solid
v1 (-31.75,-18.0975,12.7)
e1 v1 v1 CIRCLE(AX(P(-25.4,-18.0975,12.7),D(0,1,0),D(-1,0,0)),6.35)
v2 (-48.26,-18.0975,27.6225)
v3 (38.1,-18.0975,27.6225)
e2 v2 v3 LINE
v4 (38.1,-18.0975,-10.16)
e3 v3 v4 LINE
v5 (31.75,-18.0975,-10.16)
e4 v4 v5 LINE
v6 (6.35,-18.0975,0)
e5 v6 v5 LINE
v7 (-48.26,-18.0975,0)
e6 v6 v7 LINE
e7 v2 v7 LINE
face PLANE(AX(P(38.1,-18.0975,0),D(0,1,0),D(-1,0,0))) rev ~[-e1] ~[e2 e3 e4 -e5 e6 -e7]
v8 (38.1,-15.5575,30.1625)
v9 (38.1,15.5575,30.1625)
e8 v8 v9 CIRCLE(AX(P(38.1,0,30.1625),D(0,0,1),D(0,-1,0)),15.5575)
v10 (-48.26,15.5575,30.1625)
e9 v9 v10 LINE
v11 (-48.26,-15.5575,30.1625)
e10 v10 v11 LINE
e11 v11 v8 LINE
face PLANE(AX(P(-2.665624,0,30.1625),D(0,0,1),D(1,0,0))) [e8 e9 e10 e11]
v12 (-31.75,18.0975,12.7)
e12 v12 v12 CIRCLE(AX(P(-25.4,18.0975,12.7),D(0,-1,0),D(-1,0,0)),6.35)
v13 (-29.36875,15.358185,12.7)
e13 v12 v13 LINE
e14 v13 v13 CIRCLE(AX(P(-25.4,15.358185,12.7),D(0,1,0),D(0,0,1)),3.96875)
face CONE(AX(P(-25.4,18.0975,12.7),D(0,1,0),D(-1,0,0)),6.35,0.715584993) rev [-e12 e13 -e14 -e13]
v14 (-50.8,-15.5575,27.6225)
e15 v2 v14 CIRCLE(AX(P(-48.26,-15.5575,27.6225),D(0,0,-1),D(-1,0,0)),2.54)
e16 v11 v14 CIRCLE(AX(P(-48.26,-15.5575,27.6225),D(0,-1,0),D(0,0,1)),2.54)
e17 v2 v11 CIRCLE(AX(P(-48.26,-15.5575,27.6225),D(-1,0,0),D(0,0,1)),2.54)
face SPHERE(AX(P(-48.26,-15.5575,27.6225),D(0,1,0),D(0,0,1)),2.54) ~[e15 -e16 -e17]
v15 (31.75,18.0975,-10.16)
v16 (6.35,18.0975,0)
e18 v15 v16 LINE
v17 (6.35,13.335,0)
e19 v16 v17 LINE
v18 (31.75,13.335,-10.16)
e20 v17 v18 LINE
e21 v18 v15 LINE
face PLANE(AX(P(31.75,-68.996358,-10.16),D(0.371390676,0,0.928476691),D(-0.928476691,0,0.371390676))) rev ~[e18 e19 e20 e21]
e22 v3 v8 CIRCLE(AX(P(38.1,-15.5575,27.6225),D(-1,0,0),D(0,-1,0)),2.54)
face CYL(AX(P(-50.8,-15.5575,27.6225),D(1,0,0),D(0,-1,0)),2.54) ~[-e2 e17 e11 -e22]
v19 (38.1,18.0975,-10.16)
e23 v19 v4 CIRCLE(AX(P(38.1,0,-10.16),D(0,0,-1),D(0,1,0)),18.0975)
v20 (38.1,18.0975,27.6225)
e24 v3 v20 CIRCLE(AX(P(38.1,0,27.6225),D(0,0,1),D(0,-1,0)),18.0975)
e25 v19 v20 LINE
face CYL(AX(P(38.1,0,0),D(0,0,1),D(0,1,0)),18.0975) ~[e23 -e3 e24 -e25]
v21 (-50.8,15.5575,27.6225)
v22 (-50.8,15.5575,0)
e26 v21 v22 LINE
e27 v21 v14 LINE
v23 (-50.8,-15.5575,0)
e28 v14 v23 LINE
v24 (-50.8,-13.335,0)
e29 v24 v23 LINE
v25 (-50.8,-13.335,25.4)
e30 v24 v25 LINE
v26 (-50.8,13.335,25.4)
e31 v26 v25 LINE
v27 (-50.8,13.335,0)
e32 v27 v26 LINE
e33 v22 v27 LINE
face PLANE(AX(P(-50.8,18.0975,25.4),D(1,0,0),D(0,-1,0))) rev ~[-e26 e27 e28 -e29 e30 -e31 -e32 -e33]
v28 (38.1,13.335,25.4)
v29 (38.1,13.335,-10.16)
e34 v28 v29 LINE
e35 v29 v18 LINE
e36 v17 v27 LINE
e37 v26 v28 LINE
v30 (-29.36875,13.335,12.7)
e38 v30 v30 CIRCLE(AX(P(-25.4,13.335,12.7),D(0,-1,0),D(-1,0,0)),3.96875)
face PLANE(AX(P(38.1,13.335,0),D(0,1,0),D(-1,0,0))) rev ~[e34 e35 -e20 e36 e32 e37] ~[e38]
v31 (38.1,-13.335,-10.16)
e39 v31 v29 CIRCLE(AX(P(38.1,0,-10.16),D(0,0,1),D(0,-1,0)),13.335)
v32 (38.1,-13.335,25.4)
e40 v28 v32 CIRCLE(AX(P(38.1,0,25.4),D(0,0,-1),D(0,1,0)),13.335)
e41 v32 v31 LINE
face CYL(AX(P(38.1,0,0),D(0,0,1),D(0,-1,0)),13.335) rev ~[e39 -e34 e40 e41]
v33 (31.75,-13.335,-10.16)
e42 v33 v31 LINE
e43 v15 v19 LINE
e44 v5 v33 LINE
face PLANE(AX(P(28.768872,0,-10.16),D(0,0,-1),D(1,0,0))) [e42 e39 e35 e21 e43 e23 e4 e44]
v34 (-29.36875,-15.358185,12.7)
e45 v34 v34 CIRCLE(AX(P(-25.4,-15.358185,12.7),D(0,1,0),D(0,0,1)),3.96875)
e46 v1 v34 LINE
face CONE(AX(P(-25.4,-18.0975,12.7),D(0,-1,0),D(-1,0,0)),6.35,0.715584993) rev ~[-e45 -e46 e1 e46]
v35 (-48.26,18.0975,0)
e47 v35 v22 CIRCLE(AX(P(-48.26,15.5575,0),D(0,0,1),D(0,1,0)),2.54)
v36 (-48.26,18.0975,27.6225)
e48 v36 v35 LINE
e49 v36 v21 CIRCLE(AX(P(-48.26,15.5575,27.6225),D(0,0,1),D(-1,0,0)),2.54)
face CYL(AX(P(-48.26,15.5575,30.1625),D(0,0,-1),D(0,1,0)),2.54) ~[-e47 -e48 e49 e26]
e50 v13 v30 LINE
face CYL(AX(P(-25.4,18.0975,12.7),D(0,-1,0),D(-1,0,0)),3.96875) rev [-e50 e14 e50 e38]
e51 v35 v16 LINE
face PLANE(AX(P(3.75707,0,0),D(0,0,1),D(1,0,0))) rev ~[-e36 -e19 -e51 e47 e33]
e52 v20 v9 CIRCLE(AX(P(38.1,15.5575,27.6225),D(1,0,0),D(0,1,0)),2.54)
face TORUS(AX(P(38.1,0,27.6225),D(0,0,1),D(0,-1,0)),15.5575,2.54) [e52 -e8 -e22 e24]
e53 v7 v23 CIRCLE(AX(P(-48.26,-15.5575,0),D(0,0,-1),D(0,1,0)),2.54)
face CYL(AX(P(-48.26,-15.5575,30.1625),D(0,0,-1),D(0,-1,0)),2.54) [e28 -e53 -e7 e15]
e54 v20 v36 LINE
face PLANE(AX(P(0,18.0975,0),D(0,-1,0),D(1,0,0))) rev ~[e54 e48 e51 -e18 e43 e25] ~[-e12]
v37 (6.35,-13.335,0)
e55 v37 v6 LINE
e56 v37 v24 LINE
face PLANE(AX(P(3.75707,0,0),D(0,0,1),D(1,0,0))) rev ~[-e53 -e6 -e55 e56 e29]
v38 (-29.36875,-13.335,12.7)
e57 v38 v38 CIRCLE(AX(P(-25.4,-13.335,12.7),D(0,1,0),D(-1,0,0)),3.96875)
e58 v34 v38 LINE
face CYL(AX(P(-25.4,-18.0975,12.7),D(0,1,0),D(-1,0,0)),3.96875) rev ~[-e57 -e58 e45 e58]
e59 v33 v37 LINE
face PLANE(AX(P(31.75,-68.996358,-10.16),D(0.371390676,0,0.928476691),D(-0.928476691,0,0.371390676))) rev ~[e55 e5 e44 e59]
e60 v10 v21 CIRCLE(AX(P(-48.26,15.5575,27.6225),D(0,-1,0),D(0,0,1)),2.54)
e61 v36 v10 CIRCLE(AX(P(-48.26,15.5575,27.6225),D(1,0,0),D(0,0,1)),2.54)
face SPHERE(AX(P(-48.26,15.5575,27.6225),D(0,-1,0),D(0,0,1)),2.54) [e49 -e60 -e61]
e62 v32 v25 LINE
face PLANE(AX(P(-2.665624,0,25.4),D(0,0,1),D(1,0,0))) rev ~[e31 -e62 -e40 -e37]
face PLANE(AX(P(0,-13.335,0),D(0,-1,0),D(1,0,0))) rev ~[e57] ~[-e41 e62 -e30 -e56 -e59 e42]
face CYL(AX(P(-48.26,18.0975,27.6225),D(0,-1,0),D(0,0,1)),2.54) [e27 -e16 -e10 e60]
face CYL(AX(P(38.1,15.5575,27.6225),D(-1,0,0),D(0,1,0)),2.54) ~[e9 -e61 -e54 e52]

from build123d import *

# Parameters (mm, degrees)
F1_DEPTH       = 25.4
F3_DEPTH       = 4.7625
F5_D           = 7.9375
F5_DEPTH       = 12.7
F5_CSINK_D     = 12.7
F5_CSINK_ANGLE = 82
F5_TIP         = 2.3846655818
F6_R           = 2.54
F8_DEPTH       = 10.16
F9_T4_DEPTH    = 169.4252160848
F9_T9_DEPTH    = 169.4252160848


# Not quite as in the source:
# - a fillet or chamfer that OpenCascade refuses, or shapes differently, is made with other operations: its cross-section is extruded or revolved along the edge and cut away or added
# - a pattern or mirror of a feature is missing from the dataset's text; its kind, count and spacing are read off the source's solid
# - a feature names something its author has since deleted; it is built from what else it names


with BuildPart() as f1:
    # F0 (on Top) → F1 (new body)
    with BuildSketch(Plane.XY):
        with BuildLine():
            Line((38.1, 18.0975), (-50.8, 18.0975))
            Line((-50.8, 18.0975), (-50.8, 13.335))
            Line((-50.8, 13.335), (38.1, 13.335))
            ThreePointArc((38.1, 13.335), (51.435, 0), (38.1, -13.335))
            Line((38.1, -13.335), (-50.8, -13.335))
            Line((-50.8, -13.335), (-50.8, -18.0975))
            Line((-50.8, -18.0975), (38.1, -18.0975))
            ThreePointArc((38.1, -18.0975), (56.1975, 0), (38.1, 18.0975))
        make_face()
    extrude(amount=F1_DEPTH)

    # F2 (on face) → F3 (join)
    with BuildSketch(Plane.XY.offset(25.4)):
        with BuildLine():
            Line((38.1, 13.335), (-50.8, 13.335))
            Line((-50.8, 13.335), (-50.8, -13.335))
            Line((-50.8, -13.335), (38.1, -13.335))
            ThreePointArc((38.1, -13.335), (51.435, 0), (38.1, 13.335))
        make_face()
        with BuildLine():
            Line((38.1, 18.0975), (-50.8, 18.0975))
            Line((-50.8, 18.0975), (-50.8, 13.335))
            Line((-50.8, 13.335), (38.1, 13.335))
            ThreePointArc((38.1, 13.335), (51.435, 0), (38.1, -13.335))
            Line((38.1, -13.335), (-50.8, -13.335))
            Line((-50.8, -13.335), (-50.8, -18.0975))
            Line((-50.8, -18.0975), (38.1, -18.0975))
            ThreePointArc((38.1, -18.0975), (56.1975, 0), (38.1, 18.0975))
        make_face()
    extrude(amount=F3_DEPTH)

    # F5
    with Locations(Plane.XZ.offset(18.0975)):
        with Locations((-25.4, 12.7)):
            f5 = CounterSinkHole(F5_D / 2, F5_CSINK_D / 2, depth=F5_DEPTH, counter_sink_angle=F5_CSINK_ANGLE)
            with Locations((0, 0, -(F5_DEPTH + F5_TIP / 2))):  # 118° drill point
                Cone(0, F5_D / 2, F5_TIP, mode=Mode.SUBTRACT)

    # F5_copies: F5 across plane
    add(f5.mirror(Plane.ZX), mode=Mode.SUBTRACT)

    # F6
    f6_edges = [f1.edges().sort_by_distance(p)[0] for p in [
        (-50.8, 0, 30.1625),
        (-6.35, 18.0975, 30.1625),
        (-50.8, 18.0975, 15.08125),
        (56.1975, 0, 30.1625),
        (-6.35, -18.0975, 30.1625),
        (-50.8, -18.0975, 15.08125),
    ]]
    fillet(f6_edges, radius=F6_R)

    # F7 (on face) → F8 (join)
    with BuildSketch(Plane(origin=(0, 0, 0), x_dir=(1, 0, 0), z_dir=(0, 0, -1))):
        with BuildLine():
            ThreePointArc((38.1, -18.0975), (56.1975, 0), (38.1, 18.0975))
            Line((38.1, 18.0975), (0, 18.0975))
            Line((0, 18.0975), (0, 13.335))
            Line((0, 13.335), (38.1, 13.335))
            ThreePointArc((38.1, 13.335), (51.435, 0), (38.1, -13.335))
            Line((38.1, -13.335), (0, -13.335))
            Line((0, -13.335), (0, -18.0975))
            Line((0, -18.0975), (38.1, -18.0975))
        make_face()
    extrude(amount=F8_DEPTH)

    # F9: chamfer of 31.75 x 12.7 on 2 edges, made by hand


with BuildPart() as f9_tool2:
    # F9_s3 → F9_t4 (new body)
    with BuildSketch(Plane.XZ.offset(68.9963580424)):
        Polygon((31.75, -10.16), (0, 2.54), (0, -10.16), align=None)
    extrude(amount=-F9_T4_DEPTH)

    split(bisect_by=Plane.XY, keep=Keep.BOTTOM)


with BuildPart() as f1_1:
    add(f1.part)

    # F9_t1: cut F9_tool2
    add(f9_tool2.part, mode=Mode.SUBTRACT)


with BuildPart() as f9_tool7:
    # F9_s8 → F9_t9 (new body)
    with BuildSketch(Plane.XZ.offset(100.4288580424)):
        Polygon((0, 2.54), (31.75, -10.16), (0, -10.16), align=None)
    extrude(amount=-F9_T9_DEPTH)

    split(bisect_by=Plane.XY, keep=Keep.BOTTOM)


with BuildPart() as f1_2:
    add(f1_1.part)

    # F9_t6: cut F9_tool7
    add(f9_tool7.part, mode=Mode.SUBTRACT)


solid = f1_2.part
